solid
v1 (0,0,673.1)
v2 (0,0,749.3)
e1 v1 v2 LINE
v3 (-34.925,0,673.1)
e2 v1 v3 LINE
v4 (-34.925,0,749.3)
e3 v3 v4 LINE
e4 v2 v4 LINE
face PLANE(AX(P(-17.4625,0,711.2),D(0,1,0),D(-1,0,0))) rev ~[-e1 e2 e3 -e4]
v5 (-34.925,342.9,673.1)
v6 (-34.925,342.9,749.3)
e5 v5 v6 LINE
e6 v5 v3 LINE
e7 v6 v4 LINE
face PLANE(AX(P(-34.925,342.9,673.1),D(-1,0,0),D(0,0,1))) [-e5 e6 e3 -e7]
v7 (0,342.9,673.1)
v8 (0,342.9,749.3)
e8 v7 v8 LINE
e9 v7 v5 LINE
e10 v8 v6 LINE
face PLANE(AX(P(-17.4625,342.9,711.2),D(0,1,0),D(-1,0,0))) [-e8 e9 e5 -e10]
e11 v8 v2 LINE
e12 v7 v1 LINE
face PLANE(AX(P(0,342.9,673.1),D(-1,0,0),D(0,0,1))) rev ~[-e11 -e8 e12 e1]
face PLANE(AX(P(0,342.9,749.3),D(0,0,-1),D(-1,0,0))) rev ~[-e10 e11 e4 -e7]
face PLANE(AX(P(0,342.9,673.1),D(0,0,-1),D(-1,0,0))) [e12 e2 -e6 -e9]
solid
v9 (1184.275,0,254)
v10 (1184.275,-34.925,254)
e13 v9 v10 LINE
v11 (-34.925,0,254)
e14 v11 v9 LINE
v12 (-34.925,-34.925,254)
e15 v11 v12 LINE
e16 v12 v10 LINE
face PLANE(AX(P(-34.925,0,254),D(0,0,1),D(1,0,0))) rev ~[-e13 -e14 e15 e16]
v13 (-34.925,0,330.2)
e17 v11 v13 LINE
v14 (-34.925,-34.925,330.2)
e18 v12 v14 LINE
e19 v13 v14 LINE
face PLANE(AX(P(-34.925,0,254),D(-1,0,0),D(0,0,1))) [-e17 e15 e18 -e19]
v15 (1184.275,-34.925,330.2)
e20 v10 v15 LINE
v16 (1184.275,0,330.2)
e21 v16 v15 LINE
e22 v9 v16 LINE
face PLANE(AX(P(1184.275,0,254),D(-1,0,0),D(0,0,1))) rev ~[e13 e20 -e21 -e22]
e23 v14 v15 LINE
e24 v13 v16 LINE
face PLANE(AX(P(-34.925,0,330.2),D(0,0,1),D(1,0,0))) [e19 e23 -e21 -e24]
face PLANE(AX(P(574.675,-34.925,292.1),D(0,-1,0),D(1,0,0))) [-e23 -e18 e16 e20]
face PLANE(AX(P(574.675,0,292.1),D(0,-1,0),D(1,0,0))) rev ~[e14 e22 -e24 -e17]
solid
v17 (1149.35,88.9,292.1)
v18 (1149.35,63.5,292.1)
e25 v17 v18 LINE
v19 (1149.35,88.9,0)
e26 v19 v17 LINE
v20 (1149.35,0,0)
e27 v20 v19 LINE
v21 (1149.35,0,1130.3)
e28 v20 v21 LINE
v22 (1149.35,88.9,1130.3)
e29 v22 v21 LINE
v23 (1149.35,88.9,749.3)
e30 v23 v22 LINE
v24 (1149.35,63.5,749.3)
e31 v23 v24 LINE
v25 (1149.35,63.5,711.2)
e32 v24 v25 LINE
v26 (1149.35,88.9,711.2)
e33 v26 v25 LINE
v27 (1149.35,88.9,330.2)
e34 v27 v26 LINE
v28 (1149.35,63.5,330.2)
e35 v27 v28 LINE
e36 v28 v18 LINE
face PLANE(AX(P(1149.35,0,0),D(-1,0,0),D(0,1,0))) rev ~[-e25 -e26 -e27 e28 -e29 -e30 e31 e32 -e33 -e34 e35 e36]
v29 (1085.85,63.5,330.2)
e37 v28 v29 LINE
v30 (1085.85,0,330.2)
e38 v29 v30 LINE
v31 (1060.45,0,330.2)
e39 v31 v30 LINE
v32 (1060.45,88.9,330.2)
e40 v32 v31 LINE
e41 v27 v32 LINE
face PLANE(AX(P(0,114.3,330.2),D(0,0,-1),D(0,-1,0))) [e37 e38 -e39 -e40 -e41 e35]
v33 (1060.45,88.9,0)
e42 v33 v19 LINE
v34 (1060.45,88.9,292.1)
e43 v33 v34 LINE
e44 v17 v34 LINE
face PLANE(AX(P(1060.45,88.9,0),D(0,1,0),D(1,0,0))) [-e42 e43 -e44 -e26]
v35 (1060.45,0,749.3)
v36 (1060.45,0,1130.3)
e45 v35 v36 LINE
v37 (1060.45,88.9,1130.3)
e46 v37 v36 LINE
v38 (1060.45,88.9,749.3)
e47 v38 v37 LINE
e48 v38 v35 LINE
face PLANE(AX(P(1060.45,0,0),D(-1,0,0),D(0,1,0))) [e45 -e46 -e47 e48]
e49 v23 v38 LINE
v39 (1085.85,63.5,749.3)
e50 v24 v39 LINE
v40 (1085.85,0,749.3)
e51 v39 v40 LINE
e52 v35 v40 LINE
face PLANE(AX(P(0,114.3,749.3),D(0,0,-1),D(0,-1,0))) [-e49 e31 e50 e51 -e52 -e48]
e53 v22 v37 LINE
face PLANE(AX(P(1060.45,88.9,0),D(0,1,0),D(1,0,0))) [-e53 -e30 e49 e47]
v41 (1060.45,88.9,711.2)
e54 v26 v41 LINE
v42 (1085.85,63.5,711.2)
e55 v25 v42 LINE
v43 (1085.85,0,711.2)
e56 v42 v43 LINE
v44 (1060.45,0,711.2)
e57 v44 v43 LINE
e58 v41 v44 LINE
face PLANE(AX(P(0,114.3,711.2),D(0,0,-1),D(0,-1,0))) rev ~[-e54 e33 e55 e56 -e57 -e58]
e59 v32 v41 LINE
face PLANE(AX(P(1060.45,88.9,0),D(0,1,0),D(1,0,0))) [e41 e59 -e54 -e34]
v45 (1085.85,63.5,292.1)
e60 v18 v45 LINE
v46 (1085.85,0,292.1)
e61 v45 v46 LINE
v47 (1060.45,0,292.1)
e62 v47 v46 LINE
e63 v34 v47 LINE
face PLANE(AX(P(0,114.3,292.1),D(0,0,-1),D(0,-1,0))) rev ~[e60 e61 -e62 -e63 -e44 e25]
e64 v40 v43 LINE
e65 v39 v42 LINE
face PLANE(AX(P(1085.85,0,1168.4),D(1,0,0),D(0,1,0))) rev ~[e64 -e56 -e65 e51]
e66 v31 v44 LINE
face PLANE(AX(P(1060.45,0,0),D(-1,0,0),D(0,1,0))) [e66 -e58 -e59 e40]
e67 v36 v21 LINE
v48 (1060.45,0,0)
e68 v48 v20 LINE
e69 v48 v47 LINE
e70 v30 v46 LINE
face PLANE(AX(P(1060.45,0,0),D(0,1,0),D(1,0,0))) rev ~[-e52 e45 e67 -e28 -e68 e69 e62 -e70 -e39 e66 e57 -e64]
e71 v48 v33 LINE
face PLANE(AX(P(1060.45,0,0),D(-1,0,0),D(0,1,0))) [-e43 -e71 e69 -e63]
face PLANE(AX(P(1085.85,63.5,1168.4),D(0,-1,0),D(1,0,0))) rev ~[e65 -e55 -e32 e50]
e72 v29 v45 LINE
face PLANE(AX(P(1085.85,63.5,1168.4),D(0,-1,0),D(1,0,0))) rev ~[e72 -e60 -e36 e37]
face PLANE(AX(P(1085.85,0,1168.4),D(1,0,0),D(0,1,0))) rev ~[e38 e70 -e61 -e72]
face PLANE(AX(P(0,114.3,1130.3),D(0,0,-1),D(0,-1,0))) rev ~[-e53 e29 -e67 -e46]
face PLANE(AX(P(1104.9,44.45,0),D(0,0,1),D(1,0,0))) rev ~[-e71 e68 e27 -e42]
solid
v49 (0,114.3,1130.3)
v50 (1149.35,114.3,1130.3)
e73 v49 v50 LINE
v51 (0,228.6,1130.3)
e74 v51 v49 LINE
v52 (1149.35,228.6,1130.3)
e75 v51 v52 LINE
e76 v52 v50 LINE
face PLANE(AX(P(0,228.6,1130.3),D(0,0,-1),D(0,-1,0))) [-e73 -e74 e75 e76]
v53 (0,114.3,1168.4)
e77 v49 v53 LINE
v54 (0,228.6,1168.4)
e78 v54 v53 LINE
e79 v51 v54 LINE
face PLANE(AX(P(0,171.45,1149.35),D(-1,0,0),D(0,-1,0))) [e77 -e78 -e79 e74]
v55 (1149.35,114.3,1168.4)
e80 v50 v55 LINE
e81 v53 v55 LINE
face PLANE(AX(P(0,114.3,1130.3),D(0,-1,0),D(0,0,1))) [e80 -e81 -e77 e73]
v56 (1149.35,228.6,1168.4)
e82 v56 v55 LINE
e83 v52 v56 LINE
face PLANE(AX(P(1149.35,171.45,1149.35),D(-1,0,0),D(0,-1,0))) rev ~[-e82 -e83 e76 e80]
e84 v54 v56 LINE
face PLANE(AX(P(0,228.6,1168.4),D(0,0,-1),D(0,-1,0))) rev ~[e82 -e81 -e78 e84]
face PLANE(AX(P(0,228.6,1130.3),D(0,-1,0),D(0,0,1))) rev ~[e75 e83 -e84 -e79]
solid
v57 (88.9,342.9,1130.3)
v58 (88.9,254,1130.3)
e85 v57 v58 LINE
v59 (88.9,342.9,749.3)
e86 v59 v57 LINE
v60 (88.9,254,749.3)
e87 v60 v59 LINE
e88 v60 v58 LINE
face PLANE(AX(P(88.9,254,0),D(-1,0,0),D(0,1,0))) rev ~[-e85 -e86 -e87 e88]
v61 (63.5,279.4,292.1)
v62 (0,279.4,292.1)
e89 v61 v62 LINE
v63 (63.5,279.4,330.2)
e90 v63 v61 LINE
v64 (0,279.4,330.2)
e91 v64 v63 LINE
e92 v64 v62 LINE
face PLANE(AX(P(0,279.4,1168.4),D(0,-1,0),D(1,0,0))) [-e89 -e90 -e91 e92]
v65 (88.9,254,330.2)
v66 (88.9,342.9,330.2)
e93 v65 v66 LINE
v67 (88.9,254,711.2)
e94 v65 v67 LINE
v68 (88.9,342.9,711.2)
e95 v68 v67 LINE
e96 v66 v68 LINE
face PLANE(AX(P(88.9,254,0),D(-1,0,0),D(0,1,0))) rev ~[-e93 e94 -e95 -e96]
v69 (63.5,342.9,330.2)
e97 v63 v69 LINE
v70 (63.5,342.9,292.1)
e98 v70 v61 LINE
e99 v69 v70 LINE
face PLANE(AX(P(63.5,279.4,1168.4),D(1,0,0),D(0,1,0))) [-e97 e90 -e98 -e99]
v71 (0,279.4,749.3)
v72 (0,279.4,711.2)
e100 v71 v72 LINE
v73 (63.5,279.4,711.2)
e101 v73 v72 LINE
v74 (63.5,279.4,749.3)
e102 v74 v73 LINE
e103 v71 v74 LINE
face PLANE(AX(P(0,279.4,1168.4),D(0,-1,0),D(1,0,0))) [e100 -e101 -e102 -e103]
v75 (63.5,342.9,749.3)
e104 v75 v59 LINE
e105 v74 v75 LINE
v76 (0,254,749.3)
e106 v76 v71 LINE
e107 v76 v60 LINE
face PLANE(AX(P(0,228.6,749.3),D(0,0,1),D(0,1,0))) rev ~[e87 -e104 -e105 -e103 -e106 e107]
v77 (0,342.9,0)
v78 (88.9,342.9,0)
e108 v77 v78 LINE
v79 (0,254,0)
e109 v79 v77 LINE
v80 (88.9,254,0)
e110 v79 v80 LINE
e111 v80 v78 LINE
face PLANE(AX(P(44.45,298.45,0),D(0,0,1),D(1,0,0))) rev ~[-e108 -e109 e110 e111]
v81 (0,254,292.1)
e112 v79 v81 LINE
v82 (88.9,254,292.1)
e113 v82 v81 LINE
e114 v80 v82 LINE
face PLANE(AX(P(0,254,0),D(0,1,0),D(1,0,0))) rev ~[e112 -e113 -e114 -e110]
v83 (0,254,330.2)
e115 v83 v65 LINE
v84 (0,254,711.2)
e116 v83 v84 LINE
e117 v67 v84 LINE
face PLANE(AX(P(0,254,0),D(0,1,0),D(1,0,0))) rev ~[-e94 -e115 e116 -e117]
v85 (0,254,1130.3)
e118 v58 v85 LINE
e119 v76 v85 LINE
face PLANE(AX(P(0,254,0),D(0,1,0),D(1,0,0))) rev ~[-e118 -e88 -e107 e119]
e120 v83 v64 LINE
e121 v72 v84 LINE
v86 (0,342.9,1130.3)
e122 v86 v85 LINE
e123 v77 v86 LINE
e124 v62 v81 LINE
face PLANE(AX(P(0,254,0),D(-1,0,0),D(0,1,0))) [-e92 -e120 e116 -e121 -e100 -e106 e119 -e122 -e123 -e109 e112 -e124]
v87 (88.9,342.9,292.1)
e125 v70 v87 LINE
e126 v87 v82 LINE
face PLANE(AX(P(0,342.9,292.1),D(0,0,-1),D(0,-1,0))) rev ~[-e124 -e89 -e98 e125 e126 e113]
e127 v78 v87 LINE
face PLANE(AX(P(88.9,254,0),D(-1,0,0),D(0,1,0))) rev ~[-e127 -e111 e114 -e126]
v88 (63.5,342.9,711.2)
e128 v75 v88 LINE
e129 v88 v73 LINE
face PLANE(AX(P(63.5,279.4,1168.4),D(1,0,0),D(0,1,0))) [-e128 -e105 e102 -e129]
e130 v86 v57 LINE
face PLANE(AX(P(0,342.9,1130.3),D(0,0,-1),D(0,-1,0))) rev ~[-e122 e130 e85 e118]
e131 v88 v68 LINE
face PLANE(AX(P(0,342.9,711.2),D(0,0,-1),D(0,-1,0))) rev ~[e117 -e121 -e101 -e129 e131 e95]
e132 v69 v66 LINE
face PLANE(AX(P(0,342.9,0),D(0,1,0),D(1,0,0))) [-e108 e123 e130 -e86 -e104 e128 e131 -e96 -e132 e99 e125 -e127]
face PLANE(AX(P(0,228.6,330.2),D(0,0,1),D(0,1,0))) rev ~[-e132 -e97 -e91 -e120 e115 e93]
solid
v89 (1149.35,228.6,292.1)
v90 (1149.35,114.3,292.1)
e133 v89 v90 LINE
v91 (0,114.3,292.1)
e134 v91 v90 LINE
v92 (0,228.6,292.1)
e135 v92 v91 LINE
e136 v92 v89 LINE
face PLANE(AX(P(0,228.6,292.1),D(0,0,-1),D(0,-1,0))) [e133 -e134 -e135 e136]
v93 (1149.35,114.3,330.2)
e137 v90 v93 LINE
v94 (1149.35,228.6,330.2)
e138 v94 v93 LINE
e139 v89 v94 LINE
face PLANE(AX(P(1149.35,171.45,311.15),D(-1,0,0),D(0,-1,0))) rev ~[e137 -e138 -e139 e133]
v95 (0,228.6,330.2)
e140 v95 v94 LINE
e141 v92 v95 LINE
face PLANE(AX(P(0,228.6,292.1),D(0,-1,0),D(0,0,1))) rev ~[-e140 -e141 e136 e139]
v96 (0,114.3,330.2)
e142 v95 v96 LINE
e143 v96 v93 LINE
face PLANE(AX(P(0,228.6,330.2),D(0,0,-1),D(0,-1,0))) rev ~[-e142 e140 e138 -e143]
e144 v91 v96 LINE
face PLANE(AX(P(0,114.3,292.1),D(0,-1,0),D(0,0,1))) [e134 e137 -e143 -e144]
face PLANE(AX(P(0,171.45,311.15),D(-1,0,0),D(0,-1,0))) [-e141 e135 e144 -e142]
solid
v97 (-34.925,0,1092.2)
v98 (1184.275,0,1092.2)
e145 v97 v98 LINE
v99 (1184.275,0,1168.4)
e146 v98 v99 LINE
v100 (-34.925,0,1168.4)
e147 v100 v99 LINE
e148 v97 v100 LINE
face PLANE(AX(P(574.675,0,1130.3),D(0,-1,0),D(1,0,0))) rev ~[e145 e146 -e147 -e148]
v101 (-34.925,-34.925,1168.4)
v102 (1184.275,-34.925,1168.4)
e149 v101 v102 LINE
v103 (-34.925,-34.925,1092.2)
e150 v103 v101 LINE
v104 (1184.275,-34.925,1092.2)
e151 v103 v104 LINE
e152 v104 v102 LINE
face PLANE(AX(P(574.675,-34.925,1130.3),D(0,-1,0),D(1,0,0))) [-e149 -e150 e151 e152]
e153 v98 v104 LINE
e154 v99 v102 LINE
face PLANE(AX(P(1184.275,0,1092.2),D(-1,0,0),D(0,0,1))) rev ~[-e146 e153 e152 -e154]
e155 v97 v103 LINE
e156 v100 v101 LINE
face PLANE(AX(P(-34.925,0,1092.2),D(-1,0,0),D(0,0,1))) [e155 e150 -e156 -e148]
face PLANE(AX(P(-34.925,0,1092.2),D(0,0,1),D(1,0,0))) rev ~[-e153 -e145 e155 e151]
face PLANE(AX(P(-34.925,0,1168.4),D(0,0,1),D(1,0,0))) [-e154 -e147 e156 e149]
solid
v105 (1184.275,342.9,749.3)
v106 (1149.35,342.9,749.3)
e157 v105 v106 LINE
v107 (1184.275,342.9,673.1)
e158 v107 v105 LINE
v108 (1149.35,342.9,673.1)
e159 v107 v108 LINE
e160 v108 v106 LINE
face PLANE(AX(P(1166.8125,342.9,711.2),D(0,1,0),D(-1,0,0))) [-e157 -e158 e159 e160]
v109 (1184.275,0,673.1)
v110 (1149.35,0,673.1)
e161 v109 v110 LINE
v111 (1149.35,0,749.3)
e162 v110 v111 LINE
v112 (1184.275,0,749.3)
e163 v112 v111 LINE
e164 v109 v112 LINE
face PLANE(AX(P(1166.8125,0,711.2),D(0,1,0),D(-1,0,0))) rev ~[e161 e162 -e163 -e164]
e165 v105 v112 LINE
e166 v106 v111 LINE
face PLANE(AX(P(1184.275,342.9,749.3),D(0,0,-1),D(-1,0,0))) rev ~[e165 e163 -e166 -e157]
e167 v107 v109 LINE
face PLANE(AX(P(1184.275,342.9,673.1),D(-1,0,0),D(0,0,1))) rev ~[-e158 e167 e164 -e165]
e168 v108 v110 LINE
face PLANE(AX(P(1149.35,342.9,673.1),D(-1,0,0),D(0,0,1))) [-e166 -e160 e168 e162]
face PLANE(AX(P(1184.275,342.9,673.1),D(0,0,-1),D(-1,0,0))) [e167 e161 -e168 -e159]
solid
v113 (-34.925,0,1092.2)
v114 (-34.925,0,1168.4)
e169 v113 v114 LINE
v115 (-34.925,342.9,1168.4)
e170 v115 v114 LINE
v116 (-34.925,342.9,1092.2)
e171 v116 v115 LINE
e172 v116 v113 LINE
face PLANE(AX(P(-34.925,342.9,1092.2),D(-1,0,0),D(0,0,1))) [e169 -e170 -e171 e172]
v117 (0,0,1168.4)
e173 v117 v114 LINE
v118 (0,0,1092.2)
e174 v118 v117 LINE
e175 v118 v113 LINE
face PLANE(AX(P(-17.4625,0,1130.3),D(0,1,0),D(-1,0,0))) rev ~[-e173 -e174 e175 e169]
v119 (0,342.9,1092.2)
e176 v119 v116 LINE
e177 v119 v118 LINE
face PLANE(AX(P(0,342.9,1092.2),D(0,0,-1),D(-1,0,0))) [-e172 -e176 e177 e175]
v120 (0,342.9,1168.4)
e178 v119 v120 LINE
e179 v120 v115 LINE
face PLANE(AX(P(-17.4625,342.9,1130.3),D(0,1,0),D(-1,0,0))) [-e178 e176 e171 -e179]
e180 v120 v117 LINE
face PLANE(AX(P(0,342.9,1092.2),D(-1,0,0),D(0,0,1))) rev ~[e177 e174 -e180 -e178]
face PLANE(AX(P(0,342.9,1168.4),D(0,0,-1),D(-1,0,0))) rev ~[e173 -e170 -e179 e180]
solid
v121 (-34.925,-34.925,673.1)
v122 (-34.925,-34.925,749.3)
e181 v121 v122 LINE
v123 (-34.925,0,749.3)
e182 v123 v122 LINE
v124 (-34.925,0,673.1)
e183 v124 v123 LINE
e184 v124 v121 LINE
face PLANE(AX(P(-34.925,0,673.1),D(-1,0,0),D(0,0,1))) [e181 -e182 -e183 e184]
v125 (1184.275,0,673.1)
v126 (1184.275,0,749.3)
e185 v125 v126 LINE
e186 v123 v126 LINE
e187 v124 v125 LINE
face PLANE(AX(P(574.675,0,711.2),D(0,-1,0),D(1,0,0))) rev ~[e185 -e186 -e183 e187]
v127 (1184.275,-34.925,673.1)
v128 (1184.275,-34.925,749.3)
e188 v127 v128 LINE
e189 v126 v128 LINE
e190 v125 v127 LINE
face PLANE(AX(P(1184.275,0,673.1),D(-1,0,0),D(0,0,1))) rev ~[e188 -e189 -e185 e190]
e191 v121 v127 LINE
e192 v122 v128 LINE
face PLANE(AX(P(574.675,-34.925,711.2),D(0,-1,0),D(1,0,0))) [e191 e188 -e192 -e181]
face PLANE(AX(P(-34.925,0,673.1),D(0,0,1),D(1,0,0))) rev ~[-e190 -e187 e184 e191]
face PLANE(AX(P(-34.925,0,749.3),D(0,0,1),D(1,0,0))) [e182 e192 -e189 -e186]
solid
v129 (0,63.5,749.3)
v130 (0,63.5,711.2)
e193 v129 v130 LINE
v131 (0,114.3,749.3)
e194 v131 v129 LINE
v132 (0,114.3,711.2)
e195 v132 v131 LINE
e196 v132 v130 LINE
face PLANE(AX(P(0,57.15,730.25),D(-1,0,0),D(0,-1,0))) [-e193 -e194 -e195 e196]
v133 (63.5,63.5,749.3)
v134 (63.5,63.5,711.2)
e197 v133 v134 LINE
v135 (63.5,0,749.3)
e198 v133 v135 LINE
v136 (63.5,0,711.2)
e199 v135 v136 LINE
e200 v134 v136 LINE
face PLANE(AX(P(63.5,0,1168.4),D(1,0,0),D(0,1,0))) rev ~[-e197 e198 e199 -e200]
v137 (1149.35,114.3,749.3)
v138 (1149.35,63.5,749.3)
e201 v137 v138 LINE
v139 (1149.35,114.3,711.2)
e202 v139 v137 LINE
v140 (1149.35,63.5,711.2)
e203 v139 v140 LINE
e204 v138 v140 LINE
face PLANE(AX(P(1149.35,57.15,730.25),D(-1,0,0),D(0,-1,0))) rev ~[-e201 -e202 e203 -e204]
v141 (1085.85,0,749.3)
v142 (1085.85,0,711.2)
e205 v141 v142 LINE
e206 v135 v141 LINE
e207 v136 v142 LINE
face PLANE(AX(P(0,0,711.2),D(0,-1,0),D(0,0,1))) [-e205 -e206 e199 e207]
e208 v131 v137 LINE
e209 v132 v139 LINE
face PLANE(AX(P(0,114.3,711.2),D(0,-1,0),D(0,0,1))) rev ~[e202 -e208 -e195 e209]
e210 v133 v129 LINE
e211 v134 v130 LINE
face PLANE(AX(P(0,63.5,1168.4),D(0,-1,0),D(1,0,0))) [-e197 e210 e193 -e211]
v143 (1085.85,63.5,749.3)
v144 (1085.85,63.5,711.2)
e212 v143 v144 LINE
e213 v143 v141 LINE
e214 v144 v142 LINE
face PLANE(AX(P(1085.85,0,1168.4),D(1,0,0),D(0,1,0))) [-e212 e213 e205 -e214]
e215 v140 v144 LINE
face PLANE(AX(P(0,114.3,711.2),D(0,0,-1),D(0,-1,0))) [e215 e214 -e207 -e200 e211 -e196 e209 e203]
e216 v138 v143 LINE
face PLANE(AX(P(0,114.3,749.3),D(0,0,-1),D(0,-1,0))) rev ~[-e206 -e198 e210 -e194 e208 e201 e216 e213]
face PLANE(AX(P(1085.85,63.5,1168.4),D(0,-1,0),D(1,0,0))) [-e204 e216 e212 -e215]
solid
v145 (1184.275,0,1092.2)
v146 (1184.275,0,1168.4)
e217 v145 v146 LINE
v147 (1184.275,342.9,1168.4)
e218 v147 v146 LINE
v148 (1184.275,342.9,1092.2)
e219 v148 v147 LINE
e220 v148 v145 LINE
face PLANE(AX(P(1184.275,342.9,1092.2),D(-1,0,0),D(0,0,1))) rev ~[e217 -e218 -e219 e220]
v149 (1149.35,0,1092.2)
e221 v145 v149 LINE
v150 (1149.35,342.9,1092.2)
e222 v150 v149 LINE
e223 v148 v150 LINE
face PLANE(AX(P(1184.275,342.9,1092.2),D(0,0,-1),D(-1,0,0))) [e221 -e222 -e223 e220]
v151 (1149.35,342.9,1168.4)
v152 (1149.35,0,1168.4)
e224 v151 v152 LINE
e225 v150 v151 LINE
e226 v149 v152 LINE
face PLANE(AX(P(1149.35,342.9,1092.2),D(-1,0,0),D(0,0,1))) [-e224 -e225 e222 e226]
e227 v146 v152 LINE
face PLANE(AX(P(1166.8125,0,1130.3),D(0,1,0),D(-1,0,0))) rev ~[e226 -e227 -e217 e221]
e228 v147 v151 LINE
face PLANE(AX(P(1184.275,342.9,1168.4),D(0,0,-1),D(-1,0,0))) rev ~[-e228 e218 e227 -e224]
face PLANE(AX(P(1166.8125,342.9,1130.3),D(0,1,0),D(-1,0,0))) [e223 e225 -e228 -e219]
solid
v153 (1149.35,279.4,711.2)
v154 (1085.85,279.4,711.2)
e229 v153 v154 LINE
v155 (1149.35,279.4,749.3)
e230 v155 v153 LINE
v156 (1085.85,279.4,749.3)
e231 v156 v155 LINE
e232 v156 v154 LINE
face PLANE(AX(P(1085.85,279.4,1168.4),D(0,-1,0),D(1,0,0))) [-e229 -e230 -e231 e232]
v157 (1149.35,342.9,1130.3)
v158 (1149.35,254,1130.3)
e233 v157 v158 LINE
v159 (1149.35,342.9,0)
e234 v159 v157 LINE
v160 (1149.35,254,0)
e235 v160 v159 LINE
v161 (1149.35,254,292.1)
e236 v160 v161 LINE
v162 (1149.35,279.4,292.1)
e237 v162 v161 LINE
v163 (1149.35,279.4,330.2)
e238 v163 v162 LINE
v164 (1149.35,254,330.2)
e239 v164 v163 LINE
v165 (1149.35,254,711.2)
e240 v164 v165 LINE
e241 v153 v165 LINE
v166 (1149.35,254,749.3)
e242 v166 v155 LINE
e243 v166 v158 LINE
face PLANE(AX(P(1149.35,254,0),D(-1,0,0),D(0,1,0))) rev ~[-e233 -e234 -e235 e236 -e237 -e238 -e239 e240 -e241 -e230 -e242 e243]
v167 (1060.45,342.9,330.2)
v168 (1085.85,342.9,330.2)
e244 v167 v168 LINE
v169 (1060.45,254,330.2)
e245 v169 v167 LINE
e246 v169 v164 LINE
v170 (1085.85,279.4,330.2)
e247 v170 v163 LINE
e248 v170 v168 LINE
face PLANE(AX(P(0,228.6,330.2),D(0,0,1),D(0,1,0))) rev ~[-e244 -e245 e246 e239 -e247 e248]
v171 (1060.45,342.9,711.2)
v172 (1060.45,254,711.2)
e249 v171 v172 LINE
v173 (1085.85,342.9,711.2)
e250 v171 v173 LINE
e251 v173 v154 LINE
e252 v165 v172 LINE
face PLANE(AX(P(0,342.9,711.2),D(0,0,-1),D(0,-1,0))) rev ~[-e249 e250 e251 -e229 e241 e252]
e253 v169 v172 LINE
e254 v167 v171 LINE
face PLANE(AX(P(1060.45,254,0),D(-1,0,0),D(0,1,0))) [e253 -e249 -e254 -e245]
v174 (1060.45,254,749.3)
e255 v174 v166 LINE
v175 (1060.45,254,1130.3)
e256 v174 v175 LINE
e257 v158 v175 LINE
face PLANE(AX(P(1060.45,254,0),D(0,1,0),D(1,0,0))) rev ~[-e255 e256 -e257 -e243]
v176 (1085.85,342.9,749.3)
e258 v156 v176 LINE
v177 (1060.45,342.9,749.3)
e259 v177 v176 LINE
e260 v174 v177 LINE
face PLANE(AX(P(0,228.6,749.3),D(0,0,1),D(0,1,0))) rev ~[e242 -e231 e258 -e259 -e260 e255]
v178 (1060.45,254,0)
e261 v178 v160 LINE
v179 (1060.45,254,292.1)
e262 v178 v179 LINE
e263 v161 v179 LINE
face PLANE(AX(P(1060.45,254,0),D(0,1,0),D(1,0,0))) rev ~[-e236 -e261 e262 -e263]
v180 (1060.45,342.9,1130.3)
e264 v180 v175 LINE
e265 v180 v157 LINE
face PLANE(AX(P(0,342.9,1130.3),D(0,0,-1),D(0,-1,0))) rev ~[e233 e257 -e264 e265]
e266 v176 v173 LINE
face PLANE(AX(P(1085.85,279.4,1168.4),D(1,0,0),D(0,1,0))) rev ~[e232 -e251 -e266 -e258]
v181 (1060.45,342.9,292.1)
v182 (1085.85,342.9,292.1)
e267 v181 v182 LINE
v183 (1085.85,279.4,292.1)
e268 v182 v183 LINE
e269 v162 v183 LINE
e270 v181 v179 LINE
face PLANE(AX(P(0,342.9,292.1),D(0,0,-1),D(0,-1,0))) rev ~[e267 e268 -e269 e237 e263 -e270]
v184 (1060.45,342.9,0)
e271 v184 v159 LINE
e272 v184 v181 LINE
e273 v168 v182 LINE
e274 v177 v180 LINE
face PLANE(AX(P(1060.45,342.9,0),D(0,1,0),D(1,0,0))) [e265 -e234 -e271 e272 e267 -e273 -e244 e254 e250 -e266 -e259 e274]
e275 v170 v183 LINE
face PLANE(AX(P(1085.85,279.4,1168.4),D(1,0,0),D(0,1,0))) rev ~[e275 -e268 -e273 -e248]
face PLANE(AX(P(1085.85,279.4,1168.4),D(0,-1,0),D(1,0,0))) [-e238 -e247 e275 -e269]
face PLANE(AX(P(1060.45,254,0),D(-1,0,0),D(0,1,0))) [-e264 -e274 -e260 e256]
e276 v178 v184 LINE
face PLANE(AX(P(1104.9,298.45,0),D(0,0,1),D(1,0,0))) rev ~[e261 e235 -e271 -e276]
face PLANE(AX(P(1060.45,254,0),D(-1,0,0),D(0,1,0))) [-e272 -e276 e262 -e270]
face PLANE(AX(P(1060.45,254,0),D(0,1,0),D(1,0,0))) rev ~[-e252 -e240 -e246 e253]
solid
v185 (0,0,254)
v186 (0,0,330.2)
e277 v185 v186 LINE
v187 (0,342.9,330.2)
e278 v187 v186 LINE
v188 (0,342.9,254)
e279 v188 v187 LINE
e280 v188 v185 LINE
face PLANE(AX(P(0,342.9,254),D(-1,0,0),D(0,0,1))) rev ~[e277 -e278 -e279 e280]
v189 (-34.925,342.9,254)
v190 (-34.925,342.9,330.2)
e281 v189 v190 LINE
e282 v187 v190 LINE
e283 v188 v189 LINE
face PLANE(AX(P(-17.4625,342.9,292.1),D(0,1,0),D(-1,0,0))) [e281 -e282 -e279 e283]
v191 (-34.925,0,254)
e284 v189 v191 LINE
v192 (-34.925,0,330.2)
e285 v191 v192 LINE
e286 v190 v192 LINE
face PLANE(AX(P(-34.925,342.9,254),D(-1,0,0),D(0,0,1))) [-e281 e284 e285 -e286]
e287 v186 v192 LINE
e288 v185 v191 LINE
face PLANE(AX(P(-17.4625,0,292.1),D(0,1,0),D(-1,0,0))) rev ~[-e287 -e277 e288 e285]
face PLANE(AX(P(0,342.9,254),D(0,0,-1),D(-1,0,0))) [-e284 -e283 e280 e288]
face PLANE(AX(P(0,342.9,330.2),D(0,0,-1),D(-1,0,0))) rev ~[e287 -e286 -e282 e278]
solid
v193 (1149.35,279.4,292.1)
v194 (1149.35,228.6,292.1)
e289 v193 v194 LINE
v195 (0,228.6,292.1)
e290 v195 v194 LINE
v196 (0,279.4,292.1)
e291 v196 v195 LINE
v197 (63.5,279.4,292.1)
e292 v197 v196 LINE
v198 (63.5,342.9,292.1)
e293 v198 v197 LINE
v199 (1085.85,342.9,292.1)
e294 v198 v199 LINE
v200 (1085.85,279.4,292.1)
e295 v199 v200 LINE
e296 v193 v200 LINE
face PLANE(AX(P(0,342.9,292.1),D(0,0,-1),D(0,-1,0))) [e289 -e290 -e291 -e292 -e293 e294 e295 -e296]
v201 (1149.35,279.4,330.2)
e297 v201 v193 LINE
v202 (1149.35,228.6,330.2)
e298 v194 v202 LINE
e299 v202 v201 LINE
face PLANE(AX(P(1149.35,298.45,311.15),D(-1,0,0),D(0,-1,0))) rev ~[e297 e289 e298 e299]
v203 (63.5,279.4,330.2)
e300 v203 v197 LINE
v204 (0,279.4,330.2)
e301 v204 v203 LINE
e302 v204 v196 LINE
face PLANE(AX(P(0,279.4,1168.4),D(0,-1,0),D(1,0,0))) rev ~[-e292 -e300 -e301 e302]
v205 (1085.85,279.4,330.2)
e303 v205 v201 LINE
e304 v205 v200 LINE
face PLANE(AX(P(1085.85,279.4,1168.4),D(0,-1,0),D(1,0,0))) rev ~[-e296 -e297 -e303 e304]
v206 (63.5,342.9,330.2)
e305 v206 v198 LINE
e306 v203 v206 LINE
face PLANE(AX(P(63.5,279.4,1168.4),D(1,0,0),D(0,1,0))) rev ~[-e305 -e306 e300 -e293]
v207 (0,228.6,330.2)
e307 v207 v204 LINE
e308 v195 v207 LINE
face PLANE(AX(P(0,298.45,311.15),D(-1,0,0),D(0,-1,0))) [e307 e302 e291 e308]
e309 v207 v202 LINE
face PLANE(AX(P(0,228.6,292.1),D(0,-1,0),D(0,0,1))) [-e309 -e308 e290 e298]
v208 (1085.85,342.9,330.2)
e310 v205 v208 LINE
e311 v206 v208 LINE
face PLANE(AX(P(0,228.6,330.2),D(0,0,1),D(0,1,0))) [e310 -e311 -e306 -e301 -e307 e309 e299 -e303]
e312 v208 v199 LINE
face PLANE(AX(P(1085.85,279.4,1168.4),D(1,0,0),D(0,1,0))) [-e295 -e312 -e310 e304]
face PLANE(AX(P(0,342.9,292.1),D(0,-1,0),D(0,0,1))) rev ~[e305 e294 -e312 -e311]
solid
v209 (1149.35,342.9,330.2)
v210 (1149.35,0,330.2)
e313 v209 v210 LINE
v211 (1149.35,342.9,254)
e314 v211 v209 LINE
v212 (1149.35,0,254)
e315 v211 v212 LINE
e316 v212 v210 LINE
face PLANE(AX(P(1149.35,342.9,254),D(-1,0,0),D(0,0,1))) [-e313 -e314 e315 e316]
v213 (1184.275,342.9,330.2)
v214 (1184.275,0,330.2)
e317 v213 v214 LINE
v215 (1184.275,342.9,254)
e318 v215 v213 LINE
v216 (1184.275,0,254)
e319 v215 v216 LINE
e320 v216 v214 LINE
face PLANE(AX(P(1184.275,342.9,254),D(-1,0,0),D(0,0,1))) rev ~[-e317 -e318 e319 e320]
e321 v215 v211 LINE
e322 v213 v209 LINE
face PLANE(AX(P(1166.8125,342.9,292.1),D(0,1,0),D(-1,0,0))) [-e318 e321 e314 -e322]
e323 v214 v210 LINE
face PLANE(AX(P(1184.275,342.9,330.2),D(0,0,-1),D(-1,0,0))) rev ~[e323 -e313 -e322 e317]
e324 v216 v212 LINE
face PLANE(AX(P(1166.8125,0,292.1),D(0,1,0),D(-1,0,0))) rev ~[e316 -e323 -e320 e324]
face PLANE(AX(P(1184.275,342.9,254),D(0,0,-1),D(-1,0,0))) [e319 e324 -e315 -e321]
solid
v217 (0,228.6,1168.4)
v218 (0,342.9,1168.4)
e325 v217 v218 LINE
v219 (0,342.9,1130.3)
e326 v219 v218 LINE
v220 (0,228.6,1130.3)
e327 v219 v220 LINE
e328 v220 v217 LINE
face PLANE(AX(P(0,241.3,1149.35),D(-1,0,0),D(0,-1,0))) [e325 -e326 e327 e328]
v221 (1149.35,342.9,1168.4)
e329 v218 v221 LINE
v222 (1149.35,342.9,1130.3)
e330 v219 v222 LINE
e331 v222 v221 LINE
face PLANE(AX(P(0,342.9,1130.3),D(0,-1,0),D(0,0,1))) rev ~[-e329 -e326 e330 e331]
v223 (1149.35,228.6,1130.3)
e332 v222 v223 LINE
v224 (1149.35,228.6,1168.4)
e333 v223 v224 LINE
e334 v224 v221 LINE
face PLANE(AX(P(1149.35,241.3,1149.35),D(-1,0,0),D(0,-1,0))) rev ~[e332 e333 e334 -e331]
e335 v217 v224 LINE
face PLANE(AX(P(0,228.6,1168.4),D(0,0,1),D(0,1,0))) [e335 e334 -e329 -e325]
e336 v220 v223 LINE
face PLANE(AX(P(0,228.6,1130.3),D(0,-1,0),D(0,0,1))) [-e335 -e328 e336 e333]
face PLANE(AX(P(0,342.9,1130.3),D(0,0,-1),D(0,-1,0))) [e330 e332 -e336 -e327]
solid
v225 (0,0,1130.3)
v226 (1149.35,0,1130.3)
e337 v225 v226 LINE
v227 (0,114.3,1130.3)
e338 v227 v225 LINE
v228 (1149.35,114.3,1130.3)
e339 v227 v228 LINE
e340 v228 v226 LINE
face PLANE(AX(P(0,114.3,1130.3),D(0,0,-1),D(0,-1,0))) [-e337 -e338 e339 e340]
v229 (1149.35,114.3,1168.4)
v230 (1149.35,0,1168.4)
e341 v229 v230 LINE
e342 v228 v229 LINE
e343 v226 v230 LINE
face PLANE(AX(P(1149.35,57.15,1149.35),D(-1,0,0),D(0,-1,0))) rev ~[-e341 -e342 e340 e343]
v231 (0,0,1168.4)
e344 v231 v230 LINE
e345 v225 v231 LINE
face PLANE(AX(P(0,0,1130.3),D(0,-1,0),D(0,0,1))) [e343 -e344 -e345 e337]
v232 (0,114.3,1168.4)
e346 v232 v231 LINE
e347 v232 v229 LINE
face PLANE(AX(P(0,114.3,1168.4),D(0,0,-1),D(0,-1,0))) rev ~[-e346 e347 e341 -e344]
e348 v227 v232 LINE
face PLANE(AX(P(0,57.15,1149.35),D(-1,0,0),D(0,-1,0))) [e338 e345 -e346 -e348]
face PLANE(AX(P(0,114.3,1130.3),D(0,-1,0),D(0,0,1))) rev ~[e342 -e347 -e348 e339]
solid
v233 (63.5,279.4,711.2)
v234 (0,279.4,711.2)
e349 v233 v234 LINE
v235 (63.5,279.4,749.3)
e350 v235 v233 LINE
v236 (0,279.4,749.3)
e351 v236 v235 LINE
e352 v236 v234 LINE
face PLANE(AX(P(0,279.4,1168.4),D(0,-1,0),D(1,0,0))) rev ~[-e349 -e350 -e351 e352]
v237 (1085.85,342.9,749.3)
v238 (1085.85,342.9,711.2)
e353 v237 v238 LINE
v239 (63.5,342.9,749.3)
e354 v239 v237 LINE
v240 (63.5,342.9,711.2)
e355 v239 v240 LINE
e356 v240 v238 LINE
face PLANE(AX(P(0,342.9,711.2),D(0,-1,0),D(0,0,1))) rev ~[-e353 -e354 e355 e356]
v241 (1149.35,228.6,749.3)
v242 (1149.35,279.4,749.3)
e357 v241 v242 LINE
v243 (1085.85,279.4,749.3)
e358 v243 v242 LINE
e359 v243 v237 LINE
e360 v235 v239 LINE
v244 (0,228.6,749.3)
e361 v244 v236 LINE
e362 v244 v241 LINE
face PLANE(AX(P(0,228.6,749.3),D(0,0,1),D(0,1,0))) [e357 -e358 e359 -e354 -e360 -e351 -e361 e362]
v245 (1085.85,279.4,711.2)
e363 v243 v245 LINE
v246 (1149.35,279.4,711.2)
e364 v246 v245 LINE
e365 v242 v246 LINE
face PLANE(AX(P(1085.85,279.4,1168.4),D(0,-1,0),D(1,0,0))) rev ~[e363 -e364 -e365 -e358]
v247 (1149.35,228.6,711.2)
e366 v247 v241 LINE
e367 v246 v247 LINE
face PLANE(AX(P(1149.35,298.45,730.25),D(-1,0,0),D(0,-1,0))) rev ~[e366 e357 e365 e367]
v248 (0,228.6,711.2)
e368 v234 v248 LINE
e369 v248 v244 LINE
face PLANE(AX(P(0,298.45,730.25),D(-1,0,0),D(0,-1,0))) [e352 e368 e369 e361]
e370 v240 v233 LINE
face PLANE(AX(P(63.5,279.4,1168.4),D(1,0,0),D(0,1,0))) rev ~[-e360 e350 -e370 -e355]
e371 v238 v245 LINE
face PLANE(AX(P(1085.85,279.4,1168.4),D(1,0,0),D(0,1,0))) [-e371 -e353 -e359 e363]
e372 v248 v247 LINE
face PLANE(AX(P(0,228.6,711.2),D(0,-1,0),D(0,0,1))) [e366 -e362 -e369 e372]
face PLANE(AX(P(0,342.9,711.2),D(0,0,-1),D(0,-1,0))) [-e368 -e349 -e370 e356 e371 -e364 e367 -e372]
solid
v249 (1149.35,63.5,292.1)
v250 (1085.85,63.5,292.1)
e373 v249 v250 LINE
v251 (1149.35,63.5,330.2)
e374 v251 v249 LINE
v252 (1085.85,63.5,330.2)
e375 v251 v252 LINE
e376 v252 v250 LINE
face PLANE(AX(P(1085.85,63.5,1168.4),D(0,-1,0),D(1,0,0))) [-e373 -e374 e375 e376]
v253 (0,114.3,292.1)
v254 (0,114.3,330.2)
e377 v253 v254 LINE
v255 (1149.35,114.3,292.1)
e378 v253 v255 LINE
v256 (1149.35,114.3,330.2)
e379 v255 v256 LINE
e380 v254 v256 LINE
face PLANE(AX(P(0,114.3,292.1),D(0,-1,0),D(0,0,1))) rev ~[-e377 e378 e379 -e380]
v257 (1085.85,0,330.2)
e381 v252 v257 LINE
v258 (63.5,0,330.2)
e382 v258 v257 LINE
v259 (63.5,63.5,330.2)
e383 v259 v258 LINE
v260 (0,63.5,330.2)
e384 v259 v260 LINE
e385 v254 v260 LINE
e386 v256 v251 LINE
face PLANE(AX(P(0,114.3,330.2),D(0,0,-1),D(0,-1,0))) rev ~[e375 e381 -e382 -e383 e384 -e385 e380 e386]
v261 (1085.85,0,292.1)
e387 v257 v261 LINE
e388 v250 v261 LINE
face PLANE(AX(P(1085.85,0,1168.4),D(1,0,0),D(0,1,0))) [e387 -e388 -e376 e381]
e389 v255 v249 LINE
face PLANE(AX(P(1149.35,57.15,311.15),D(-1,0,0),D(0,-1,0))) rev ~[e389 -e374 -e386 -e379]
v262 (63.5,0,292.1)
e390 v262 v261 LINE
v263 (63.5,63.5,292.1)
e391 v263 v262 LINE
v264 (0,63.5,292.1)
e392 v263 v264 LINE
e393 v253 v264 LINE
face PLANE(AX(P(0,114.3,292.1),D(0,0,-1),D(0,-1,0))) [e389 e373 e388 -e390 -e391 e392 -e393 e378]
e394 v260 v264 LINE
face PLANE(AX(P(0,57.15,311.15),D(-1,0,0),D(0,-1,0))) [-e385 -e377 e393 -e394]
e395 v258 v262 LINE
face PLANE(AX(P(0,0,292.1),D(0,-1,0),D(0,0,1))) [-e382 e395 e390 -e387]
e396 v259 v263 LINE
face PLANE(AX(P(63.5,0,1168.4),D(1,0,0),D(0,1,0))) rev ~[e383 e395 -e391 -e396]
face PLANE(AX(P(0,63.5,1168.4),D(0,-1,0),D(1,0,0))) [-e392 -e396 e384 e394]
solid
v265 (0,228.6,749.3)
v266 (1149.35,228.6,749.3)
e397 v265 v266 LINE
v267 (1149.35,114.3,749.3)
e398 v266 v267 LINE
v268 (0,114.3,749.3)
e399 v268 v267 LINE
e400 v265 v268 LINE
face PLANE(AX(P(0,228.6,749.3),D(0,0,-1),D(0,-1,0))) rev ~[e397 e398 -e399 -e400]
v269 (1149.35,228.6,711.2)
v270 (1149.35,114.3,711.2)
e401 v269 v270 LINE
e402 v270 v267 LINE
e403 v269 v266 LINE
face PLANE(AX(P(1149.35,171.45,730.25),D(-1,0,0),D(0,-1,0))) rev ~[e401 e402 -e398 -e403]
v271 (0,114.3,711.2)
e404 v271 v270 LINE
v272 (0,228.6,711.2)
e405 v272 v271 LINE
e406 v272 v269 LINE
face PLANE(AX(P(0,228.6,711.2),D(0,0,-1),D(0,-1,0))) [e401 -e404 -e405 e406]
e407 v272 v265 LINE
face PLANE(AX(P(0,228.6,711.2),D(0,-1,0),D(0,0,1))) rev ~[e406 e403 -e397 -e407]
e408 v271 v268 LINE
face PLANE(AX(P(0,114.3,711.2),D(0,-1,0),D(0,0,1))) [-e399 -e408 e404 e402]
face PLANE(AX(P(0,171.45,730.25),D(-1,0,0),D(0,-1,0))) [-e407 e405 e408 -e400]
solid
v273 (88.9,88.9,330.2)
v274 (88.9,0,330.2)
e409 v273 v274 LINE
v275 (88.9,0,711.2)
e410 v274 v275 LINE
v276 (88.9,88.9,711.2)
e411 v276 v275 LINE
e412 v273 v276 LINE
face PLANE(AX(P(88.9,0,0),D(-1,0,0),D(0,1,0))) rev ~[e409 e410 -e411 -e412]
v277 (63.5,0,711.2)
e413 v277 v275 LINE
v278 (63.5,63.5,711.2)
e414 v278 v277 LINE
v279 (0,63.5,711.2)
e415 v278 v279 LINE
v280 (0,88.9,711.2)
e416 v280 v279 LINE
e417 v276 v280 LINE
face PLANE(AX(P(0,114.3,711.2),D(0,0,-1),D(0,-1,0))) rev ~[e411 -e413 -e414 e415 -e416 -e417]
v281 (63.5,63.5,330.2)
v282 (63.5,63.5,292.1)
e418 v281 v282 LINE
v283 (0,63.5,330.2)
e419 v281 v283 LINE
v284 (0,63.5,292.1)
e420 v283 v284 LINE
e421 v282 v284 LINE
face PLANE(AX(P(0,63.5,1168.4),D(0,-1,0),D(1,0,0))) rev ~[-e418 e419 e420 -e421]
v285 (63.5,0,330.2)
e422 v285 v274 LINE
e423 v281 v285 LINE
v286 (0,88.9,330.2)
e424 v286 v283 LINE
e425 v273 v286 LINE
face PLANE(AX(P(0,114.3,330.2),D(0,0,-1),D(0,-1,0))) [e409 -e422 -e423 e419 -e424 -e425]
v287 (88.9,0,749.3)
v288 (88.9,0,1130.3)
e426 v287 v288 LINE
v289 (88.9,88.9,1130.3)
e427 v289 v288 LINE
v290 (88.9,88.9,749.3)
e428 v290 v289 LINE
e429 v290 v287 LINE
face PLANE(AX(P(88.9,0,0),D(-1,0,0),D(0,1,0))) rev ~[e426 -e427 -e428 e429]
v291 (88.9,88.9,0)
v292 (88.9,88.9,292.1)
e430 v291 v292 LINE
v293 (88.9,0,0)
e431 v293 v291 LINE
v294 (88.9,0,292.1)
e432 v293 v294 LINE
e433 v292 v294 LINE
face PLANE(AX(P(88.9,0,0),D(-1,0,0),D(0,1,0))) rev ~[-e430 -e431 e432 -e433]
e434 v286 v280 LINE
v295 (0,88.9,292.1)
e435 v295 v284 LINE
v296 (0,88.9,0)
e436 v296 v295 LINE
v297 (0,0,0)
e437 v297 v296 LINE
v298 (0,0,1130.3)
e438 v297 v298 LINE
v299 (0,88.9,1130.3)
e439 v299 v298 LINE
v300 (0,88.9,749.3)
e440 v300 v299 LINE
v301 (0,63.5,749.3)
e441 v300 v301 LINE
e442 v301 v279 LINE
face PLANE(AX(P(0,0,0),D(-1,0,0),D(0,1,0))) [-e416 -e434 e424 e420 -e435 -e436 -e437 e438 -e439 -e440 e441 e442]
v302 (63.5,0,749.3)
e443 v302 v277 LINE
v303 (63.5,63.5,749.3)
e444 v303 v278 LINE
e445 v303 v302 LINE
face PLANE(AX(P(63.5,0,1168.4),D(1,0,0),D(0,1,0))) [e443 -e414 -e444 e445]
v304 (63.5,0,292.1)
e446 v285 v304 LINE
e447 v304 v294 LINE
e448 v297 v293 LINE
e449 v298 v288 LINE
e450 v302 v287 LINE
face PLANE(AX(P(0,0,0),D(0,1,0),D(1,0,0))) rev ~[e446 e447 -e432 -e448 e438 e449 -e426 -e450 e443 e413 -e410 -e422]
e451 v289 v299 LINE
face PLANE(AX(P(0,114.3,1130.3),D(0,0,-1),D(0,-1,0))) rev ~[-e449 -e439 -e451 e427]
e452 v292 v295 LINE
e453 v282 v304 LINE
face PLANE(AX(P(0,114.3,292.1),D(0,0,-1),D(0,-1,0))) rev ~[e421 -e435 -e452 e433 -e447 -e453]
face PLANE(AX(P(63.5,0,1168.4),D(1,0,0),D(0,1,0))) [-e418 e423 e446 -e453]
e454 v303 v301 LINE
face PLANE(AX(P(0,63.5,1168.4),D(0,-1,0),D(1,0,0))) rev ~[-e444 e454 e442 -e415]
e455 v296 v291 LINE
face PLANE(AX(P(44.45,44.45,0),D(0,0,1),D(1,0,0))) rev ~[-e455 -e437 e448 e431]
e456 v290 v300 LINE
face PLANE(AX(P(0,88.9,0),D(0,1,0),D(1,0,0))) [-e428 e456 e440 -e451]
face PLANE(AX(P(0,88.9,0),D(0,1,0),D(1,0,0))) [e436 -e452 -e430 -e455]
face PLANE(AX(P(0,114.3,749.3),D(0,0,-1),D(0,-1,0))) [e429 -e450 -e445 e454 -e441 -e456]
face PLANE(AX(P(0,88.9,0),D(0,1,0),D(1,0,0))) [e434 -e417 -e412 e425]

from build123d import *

# Parameters (mm, degrees)
F0_W      = 88.9
F0_H      = 88.9
F1_DEPTH  = 1168.4
F2_W      = 25.4
F2_H      = 38.1
F2_W_2    = 88.9
F3_DEPTH  = 1149.35
F2_W_3    = 114.3
F4_DEPTH  = 1149.35
F5_W      = 63.5
F5_H      = 63.5
F6_DEPTH  = 1168.401
F8_W      = 34.925
F8_H      = 76.2
F9_DEPTH  = 342.9
F10_W     = 1219.2
F10_H     = 76.2
F11_DEPTH = 34.925


with BuildPart() as f1:
    # F0 (on Top) → F1 (new body)
    with BuildSketch(Plane.XY):
        with Locations((44.45, 44.45)):
            Rectangle(F0_W, F0_H)
    extrude(amount=F1_DEPTH)


with BuildPart() as f1b:
    # F0 (on Top) → F1, piece 2 (new body)
    with BuildSketch(Plane.XY):
        with Locations((1104.9, 44.45)):
            Rectangle(F0_W, F0_H)
    extrude(amount=F1_DEPTH)


with BuildPart() as f1c:
    # F0 (on Top) → F1, piece 3 (new body)
    with BuildSketch(Plane.XY):
        with Locations((44.45, 298.45)):
            Rectangle(F0_W, F0_H)
    extrude(amount=F1_DEPTH)


with BuildPart() as f1d:
    # F0 (on Top) → F1, piece 4 (new body)
    with BuildSketch(Plane.XY):
        with Locations((1104.9, 298.45)):
            Rectangle(F0_W, F0_H)
    extrude(amount=F1_DEPTH)


with BuildPart() as f3:
    # F2 (on face) → F3 (new body, through all)
    with BuildSketch(Plane(origin=(0, 0, 0), x_dir=(0, -1, 0), z_dir=(-1, 0, 0))):
        with Locations((-241.3, 1149.35)):
            Rectangle(F2_W, F2_H)
        with Locations((-298.45, 1149.35)):
            Rectangle(F2_W_2, F2_H)
    extrude(amount=-F3_DEPTH)


with BuildPart() as f3b:
    # F2 (on face) → F3, piece 2 (new body, through all)
    with BuildSketch(Plane(origin=(0, 0, 0), x_dir=(0, -1, 0), z_dir=(-1, 0, 0))):
        with Locations((-57.15, 1149.35)):
            Rectangle(F2_W_3, F2_H)
    extrude(amount=-F3_DEPTH)


with BuildPart() as f3c:
    # F2 (on face) → F3, piece 3 (new body, through all)
    with BuildSketch(Plane(origin=(0, 0, 0), x_dir=(0, -1, 0), z_dir=(-1, 0, 0))):
        with Locations((-298.45, 730.25)):
            Rectangle(F2_W_2, F2_H)
        with Locations((-241.3, 730.25)):
            Rectangle(F2_W, F2_H)
    extrude(amount=-F3_DEPTH)


with BuildPart() as f3d:
    # F2 (on face) → F3, piece 4 (new body, through all)
    with BuildSketch(Plane(origin=(0, 0, 0), x_dir=(0, -1, 0), z_dir=(-1, 0, 0))):
        with Locations((-298.45, 311.15)):
            Rectangle(F2_W_2, F2_H)
        with Locations((-241.3, 311.15)):
            Rectangle(F2_W, F2_H)
    extrude(amount=-F3_DEPTH)


with BuildPart() as f3e:
    # F2 (on face) → F3, piece 5 (new body, through all)
    with BuildSketch(Plane(origin=(0, 0, 0), x_dir=(0, -1, 0), z_dir=(-1, 0, 0))):
        with Locations((-57.15, 311.15)):
            Rectangle(F2_W_3, F2_H)
    extrude(amount=-F3_DEPTH)


with BuildPart() as f3f:
    # F2 (on face) → F3, piece 6 (new body, through all)
    with BuildSketch(Plane(origin=(0, 0, 0), x_dir=(0, -1, 0), z_dir=(-1, 0, 0))):
        with Locations((-57.15, 730.25)):
            Rectangle(F2_W_3, F2_H)
    extrude(amount=-F3_DEPTH)


with BuildPart() as f4:
    # F2 (on face) → F4 (new body, through all)
    with BuildSketch(Plane(origin=(0, 0, 0), x_dir=(0, -1, 0), z_dir=(-1, 0, 0))):
        with Locations((-171.45, 1149.35)):
            Rectangle(F2_W_3, F2_H)
    extrude(amount=-F4_DEPTH)


with BuildPart() as f4b:
    # F2 (on face) → F4, piece 2 (new body, through all)
    with BuildSketch(Plane(origin=(0, 0, 0), x_dir=(0, -1, 0), z_dir=(-1, 0, 0))):
        with Locations((-171.45, 730.25)):
            Rectangle(F2_W_3, F2_H)
    extrude(amount=-F4_DEPTH)


with BuildPart() as f4c:
    # F2 (on face) → F4, piece 3 (new body, through all)
    with BuildSketch(Plane(origin=(0, 0, 0), x_dir=(0, -1, 0), z_dir=(-1, 0, 0))):
        with Locations((-171.45, 311.15)):
            Rectangle(F2_W_3, F2_H)
    extrude(amount=-F4_DEPTH)


with BuildPart() as f6_tool:
    # F5 (on face) → F6 (new body, through all)
    with BuildSketch(Plane.XY.offset(1168.4)):
        with Locations((31.75, 31.75)):
            Rectangle(F5_W, F5_H)
        with Locations((1117.6, 31.75)):
            Rectangle(F5_W, F5_H)
        with Locations((1117.6, 311.15)):
            Rectangle(F5_W, F5_H)
        with Locations((31.75, 311.15)):
            Rectangle(F5_W, F5_H)
    extrude(amount=-F6_DEPTH)


with BuildPart() as f3c_1:
    add(f3c.part)

    # F6: cut by f6_tool
    add(f6_tool.part, mode=Mode.SUBTRACT)


with BuildPart() as f3d_1:
    add(f3d.part)

    # F6: cut by f6_tool
    add(f6_tool.part, mode=Mode.SUBTRACT)


with BuildPart() as f3e_1:
    add(f3e.part)

    # F6: cut by f6_tool
    add(f6_tool.part, mode=Mode.SUBTRACT)


with BuildPart() as f3f_1:
    add(f3f.part)

    # F6: cut by f6_tool
    add(f6_tool.part, mode=Mode.SUBTRACT)


with BuildPart() as f1c_1:
    add(f1c.part)

    # F7: cut F3c, F3f, F3d, F3e, F3, F3b
    add(f3c_1.part, mode=Mode.SUBTRACT)
    add(f3f_1.part, mode=Mode.SUBTRACT)
    add(f3d_1.part, mode=Mode.SUBTRACT)
    add(f3e_1.part, mode=Mode.SUBTRACT)
    add(f3.part, mode=Mode.SUBTRACT)
    add(f3b.part, mode=Mode.SUBTRACT)


with BuildPart() as f1_1:
    add(f1.part)

    # F7: cut F3c, F3f, F3d, F3e, F3, F3b
    add(f3c_1.part, mode=Mode.SUBTRACT)
    add(f3f_1.part, mode=Mode.SUBTRACT)
    add(f3d_1.part, mode=Mode.SUBTRACT)
    add(f3e_1.part, mode=Mode.SUBTRACT)
    add(f3.part, mode=Mode.SUBTRACT)
    add(f3b.part, mode=Mode.SUBTRACT)


with BuildPart() as f1d_1:
    add(f1d.part)

    # F7: cut F3c, F3f, F3d, F3e, F3, F3b
    add(f3c_1.part, mode=Mode.SUBTRACT)
    add(f3f_1.part, mode=Mode.SUBTRACT)
    add(f3d_1.part, mode=Mode.SUBTRACT)
    add(f3e_1.part, mode=Mode.SUBTRACT)
    add(f3.part, mode=Mode.SUBTRACT)
    add(f3b.part, mode=Mode.SUBTRACT)


with BuildPart() as f1b_1:
    add(f1b.part)

    # F7: cut F3c, F3f, F3d, F3e, F3, F3b
    add(f3c_1.part, mode=Mode.SUBTRACT)
    add(f3f_1.part, mode=Mode.SUBTRACT)
    add(f3d_1.part, mode=Mode.SUBTRACT)
    add(f3e_1.part, mode=Mode.SUBTRACT)
    add(f3.part, mode=Mode.SUBTRACT)
    add(f3b.part, mode=Mode.SUBTRACT)


with BuildPart() as f9:
    # F8 (on face) → F9 (new body, through all)
    with BuildSketch(Plane(origin=(0, 342.9, 0), x_dir=(-1, 0, 0), z_dir=(0, 1, 0))):
        with Locations((-1166.8125, 1130.3)):
            Rectangle(F8_W, F8_H)
    extrude(amount=-F9_DEPTH)


with BuildPart() as f9b:
    # F8 (on face) → F9, piece 2 (new body, through all)
    with BuildSketch(Plane(origin=(0, 342.9, 0), x_dir=(-1, 0, 0), z_dir=(0, 1, 0))):
        with Locations((-1166.8125, 711.2)):
            Rectangle(F8_W, F8_H)
    extrude(amount=-F9_DEPTH)


with BuildPart() as f9c:
    # F8 (on face) → F9, piece 3 (new body, through all)
    with BuildSketch(Plane(origin=(0, 342.9, 0), x_dir=(-1, 0, 0), z_dir=(0, 1, 0))):
        with Locations((-1166.8125, 292.1)):
            Rectangle(F8_W, F8_H)
    extrude(amount=-F9_DEPTH)


with BuildPart() as f9d:
    # F8 (on face) → F9, piece 4 (new body, through all)
    with BuildSketch(Plane(origin=(0, 342.9, 0), x_dir=(-1, 0, 0), z_dir=(0, 1, 0))):
        with Locations((17.4625, 1130.3)):
            Rectangle(F8_W, F8_H)
    extrude(amount=-F9_DEPTH)


with BuildPart() as f9e:
    # F8 (on face) → F9, piece 5 (new body, through all)
    with BuildSketch(Plane(origin=(0, 342.9, 0), x_dir=(-1, 0, 0), z_dir=(0, 1, 0))):
        with Locations((17.4625, 711.2)):
            Rectangle(F8_W, F8_H)
    extrude(amount=-F9_DEPTH)


with BuildPart() as f9f:
    # F8 (on face) → F9, piece 6 (new body, through all)
    with BuildSketch(Plane(origin=(0, 342.9, 0), x_dir=(-1, 0, 0), z_dir=(0, 1, 0))):
        with Locations((17.4625, 292.1)):
            Rectangle(F8_W, F8_H)
    extrude(amount=-F9_DEPTH)


with BuildPart() as f11:
    # F10 (on face) → F11 (new body)
    with BuildSketch(Plane.XZ):
        with Locations((574.675, 292.1)):
            Rectangle(F10_W, F10_H)
    extrude(amount=F11_DEPTH)


with BuildPart() as f11b:
    # F10 (on face) → F11, piece 2 (new body)
    with BuildSketch(Plane.XZ):
        with Locations((574.675, 711.2)):
            Rectangle(F10_W, F10_H)
    extrude(amount=F11_DEPTH)


with BuildPart() as f11c:
    # F10 (on face) → F11, piece 3 (new body)
    with BuildSketch(Plane.XZ):
        with Locations((574.675, 1130.3)):
            Rectangle(F10_W, F10_H)
    extrude(amount=F11_DEPTH)


solid = Compound([f3.part, f3b.part, f4.part, f4b.part, f4c.part, f3c_1.part, f3d_1.part, f3e_1.part, f3f_1.part, f1c_1.part, f1_1.part, f1d_1.part, f1b_1.part, f9.part, f9b.part, f9c.part, f9d.part, f9e.part, f9f.part, f11.part, f11b.part, f11c.part])
